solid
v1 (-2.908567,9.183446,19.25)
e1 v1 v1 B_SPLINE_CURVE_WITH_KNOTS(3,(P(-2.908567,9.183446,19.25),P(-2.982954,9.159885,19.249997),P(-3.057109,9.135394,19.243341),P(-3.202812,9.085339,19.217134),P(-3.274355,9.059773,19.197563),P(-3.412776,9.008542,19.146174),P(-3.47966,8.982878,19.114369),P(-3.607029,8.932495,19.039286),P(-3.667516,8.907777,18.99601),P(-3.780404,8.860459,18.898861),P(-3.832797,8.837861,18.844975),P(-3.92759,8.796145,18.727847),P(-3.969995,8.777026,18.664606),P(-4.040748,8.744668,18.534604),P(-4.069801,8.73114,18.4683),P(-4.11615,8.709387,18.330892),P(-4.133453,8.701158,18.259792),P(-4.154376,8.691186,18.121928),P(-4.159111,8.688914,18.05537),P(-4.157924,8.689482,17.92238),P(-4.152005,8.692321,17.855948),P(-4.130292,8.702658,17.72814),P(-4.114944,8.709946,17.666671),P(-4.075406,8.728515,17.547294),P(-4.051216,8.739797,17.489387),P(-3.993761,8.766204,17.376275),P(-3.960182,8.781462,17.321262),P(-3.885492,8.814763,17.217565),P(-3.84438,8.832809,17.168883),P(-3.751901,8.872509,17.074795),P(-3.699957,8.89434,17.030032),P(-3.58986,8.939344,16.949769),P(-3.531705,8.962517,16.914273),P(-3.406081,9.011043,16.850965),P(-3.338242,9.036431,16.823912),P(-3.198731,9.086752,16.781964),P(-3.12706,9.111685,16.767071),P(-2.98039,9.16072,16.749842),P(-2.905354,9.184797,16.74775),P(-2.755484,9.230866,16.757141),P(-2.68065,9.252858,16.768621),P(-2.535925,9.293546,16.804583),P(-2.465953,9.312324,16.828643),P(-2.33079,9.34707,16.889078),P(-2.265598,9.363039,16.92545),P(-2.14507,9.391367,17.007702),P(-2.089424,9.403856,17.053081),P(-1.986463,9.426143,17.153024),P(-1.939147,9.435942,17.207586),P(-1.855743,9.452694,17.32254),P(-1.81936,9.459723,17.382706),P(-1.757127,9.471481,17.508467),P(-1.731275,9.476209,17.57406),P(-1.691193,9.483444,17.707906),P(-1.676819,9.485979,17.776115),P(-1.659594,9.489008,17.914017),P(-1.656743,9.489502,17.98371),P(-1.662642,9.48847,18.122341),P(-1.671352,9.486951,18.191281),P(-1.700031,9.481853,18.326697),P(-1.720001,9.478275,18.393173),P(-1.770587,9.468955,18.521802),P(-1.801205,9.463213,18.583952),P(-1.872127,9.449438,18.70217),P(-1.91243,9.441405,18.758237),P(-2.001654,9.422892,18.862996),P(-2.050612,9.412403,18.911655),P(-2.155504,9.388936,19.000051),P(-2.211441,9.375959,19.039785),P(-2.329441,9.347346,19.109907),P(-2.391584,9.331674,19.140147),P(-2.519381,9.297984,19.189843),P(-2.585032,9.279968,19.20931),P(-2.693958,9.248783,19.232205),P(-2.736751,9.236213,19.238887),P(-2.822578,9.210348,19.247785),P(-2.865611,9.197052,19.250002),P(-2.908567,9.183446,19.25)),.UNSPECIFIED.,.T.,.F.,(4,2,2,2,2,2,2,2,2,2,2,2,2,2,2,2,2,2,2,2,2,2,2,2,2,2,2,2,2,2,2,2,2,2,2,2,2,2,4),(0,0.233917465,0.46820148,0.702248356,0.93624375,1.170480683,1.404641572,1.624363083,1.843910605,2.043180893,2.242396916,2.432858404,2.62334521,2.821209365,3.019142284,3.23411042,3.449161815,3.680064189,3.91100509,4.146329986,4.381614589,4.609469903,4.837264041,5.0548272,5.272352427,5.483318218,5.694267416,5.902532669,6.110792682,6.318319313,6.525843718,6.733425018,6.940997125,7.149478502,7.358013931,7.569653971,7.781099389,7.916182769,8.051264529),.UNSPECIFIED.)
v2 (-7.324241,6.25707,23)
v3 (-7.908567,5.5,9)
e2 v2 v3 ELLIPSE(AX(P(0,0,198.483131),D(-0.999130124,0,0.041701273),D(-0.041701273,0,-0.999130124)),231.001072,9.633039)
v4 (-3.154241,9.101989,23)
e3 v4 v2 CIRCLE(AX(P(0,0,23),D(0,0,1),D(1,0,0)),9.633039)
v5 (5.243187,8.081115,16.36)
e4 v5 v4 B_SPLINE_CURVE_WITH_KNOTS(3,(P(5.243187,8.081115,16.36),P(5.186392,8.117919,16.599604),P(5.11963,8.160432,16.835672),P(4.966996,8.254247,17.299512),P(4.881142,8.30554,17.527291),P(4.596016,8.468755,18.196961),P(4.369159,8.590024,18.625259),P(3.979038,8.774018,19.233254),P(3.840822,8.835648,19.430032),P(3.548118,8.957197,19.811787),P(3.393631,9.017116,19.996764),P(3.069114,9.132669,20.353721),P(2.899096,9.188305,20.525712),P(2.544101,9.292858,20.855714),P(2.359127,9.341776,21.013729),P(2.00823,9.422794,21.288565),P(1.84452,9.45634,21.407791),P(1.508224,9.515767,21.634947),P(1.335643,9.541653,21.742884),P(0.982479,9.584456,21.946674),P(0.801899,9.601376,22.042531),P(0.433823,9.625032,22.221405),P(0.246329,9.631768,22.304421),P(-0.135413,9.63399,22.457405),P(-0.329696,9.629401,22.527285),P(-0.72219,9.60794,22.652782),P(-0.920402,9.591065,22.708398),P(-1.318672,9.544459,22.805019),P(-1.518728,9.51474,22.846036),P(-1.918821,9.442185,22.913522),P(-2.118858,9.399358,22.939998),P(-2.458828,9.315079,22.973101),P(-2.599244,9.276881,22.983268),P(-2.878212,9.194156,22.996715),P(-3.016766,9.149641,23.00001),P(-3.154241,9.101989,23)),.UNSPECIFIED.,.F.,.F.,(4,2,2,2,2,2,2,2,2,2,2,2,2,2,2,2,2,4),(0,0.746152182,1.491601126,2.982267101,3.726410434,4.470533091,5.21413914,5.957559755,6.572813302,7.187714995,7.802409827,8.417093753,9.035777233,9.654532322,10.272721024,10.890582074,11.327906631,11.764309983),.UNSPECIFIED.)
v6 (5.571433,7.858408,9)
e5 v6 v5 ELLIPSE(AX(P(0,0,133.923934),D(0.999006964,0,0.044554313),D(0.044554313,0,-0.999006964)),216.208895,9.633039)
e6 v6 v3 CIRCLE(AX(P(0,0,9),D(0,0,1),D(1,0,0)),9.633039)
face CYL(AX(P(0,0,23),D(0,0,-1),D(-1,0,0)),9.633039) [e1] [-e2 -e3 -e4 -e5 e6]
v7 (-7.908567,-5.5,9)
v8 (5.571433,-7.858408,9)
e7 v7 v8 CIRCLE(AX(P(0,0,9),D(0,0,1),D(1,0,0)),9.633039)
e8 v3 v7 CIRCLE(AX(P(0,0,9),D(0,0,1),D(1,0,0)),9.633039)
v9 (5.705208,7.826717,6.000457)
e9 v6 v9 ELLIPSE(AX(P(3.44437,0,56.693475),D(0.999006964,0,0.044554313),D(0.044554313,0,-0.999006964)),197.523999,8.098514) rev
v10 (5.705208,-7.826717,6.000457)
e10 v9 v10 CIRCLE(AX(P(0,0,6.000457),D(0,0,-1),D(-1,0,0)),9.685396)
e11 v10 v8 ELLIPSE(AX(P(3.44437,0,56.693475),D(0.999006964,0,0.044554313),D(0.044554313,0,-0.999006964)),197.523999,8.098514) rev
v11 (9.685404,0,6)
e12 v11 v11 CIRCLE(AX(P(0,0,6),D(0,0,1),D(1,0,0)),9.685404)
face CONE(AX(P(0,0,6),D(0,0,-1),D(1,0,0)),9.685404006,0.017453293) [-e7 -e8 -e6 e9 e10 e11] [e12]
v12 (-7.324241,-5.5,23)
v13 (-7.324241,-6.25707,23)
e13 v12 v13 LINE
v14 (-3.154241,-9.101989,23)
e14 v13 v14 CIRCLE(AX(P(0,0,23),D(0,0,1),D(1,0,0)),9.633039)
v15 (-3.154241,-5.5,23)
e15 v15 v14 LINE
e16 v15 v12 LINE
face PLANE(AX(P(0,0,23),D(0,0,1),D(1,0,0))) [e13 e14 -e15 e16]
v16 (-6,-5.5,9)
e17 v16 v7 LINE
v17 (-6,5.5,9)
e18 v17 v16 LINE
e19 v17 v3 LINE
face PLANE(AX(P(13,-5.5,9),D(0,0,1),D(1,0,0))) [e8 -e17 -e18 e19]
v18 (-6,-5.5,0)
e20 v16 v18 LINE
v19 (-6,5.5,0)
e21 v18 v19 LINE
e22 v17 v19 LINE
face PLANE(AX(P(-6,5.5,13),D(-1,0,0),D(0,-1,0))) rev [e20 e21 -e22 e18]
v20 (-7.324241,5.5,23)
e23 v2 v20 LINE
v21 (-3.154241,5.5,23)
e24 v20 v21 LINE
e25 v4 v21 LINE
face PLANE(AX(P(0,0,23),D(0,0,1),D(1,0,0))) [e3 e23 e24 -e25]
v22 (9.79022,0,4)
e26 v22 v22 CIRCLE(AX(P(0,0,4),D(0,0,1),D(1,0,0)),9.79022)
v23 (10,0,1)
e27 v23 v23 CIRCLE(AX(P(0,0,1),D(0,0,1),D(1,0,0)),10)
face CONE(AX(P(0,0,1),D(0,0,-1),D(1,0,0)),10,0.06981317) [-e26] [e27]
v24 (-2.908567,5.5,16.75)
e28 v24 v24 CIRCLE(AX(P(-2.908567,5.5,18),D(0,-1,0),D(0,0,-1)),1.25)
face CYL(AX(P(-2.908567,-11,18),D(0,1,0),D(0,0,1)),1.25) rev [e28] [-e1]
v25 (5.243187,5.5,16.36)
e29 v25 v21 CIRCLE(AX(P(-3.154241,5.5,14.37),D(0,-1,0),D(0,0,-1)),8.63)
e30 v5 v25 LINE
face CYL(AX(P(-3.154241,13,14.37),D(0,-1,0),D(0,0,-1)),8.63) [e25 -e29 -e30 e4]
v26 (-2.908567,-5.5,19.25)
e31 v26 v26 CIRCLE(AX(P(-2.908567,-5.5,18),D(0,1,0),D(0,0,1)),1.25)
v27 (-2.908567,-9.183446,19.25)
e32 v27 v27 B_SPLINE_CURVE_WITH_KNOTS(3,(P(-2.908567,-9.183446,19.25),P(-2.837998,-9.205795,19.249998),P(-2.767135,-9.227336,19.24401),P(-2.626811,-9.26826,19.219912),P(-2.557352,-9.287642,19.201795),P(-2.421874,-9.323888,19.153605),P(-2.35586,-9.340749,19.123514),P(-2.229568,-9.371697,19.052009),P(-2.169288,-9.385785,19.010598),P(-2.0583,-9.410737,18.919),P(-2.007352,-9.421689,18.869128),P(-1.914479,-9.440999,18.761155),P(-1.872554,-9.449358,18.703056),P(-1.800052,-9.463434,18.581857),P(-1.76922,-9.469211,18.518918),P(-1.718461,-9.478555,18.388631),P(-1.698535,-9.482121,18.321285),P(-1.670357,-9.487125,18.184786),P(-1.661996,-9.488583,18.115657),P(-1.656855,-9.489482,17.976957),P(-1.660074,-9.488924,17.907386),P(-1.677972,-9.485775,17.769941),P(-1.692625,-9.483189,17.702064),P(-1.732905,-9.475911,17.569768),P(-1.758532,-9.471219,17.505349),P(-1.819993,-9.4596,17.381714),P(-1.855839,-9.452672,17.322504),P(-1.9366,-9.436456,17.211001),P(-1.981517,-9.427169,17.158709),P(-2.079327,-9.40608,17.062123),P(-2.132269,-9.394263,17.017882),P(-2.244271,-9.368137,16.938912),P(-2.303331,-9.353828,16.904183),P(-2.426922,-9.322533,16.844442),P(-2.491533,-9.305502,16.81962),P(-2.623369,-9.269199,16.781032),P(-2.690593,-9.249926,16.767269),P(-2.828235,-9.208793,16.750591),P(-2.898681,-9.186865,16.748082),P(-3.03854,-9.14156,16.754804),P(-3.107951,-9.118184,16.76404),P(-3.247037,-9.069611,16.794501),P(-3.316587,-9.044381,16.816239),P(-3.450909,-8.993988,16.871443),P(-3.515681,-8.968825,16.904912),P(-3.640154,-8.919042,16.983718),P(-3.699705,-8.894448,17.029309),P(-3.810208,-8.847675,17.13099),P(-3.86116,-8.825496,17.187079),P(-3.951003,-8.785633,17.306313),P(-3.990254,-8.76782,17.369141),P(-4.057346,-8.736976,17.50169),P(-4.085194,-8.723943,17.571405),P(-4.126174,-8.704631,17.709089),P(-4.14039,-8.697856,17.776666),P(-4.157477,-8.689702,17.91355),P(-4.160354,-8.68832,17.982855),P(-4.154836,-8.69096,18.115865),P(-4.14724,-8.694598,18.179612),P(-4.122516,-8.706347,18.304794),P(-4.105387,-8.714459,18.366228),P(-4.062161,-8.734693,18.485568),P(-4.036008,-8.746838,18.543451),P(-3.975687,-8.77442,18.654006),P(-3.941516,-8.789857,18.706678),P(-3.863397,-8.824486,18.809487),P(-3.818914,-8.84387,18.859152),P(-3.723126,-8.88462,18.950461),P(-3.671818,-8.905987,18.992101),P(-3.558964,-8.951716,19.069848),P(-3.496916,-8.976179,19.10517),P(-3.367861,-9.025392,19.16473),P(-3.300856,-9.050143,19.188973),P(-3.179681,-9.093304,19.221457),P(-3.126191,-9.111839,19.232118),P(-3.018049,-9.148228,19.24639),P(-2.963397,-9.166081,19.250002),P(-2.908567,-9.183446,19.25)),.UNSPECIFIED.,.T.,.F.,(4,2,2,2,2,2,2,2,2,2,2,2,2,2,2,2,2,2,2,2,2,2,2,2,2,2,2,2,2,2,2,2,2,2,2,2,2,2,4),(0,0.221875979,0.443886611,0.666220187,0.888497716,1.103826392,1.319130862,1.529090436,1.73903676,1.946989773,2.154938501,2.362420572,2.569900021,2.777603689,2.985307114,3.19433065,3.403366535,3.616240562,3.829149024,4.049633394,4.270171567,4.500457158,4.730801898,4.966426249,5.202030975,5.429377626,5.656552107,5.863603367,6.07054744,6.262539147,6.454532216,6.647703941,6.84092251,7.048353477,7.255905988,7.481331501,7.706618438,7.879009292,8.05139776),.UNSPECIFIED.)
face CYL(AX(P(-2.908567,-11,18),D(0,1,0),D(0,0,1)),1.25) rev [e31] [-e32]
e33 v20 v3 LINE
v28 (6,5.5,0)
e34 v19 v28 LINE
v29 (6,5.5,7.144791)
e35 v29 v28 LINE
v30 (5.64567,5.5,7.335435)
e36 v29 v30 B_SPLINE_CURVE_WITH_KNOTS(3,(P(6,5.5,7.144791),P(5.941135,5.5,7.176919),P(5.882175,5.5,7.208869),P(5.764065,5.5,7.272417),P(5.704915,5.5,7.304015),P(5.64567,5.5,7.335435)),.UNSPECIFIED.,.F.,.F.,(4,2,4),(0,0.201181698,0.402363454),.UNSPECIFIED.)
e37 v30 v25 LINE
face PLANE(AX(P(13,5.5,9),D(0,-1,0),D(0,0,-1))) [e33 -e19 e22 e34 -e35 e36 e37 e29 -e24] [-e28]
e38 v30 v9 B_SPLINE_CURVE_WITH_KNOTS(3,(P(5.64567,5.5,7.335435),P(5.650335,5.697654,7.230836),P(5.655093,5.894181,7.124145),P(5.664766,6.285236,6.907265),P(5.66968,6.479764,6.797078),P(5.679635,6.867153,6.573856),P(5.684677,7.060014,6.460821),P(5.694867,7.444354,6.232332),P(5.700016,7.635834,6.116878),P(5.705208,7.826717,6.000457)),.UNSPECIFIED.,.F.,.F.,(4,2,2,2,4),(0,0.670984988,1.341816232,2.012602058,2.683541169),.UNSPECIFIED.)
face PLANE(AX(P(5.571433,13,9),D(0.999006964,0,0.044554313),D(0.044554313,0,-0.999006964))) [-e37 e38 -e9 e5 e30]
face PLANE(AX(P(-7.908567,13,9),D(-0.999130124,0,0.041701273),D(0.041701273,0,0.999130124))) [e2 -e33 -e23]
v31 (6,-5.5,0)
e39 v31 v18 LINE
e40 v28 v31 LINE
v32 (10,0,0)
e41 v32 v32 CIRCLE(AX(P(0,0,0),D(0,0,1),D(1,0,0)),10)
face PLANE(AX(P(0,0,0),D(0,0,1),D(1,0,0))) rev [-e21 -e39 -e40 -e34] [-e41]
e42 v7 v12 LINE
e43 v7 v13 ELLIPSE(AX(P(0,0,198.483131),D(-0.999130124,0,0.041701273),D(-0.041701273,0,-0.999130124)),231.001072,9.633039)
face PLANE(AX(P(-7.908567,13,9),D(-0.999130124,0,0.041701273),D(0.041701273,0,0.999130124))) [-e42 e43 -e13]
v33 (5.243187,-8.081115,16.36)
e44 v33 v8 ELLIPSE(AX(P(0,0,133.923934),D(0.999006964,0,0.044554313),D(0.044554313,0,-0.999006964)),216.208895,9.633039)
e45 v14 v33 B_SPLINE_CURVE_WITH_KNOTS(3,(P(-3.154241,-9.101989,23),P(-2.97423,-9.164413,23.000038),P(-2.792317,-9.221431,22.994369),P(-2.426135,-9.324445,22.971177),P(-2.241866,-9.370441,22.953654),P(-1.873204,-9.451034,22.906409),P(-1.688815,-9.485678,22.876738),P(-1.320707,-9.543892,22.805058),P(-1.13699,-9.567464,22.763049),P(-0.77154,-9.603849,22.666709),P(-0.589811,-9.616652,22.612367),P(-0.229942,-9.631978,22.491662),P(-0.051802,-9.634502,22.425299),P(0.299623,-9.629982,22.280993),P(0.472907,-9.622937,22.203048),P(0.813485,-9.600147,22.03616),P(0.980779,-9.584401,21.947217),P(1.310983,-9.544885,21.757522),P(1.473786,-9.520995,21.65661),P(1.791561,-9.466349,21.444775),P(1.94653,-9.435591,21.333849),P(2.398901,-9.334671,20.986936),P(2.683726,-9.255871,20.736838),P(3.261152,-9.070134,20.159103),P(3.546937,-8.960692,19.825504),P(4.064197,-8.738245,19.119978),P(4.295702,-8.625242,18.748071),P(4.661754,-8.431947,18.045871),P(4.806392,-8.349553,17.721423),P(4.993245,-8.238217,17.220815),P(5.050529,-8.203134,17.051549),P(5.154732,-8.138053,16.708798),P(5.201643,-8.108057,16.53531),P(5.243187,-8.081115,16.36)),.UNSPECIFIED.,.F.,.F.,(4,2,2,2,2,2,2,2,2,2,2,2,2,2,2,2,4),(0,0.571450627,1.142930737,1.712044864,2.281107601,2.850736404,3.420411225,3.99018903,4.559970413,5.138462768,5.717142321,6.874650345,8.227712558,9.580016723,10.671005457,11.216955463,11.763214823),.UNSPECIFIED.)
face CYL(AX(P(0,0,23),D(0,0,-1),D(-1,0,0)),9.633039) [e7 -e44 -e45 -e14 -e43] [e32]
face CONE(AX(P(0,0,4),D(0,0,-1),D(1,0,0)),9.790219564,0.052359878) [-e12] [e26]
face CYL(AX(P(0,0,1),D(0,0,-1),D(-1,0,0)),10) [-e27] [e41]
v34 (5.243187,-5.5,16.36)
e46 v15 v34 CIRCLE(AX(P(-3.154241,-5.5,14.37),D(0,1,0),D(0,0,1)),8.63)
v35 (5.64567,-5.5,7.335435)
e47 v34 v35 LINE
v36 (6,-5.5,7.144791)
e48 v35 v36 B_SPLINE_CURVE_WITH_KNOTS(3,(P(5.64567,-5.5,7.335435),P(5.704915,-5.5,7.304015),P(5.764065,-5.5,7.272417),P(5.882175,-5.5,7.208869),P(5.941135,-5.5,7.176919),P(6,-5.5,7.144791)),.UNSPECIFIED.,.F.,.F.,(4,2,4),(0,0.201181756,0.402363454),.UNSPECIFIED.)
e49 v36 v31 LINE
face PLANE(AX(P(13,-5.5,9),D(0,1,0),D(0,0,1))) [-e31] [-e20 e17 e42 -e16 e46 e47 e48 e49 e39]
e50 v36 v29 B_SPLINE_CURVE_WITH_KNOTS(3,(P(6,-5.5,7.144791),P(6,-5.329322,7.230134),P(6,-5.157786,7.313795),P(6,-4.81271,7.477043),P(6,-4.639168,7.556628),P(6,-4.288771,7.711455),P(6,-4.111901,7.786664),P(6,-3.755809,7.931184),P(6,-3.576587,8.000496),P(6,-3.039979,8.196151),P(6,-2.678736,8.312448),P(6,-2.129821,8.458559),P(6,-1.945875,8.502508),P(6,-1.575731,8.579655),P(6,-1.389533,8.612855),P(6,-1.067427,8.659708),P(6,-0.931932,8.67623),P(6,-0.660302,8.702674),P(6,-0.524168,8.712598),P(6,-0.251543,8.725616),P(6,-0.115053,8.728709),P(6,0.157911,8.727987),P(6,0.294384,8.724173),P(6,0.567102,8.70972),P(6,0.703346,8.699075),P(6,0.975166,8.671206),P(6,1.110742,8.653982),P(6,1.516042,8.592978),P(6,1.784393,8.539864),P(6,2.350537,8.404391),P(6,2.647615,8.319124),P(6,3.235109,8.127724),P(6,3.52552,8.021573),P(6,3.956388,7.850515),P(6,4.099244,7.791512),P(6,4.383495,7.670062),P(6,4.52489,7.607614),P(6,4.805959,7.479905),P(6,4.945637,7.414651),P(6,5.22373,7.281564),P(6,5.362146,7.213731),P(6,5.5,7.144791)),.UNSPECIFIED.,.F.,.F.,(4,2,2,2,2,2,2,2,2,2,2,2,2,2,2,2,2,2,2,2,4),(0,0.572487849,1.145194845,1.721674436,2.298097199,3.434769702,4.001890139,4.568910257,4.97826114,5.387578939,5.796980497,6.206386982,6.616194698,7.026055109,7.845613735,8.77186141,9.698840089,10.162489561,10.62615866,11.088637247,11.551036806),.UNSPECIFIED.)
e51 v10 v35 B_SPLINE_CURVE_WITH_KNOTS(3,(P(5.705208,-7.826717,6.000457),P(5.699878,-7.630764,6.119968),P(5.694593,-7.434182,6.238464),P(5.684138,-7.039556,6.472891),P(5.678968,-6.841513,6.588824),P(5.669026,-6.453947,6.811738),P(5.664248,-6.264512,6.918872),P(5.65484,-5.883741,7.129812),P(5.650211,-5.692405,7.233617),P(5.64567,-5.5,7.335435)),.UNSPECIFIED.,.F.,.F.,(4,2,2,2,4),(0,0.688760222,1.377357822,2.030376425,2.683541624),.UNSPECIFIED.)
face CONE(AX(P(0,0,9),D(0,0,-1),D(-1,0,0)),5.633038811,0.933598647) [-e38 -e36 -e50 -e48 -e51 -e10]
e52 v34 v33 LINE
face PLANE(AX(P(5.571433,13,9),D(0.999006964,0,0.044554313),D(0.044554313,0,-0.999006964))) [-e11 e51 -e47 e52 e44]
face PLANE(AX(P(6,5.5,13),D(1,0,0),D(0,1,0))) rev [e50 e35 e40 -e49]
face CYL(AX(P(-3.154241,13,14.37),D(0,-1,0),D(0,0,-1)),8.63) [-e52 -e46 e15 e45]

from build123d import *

# Parameters (mm, degrees)
SKETCH1_R               = 10
BOSS_EXTRUDE1_DEPTH     = 1
SKETCH2_R               = 10
BOSS_EXTRUDE2_DEPTH     = 3
BOSS_EXTRUDE2_TAPER     = 4
SKETCH3_R               = 9.790219564
BOSS_EXTRUDE3_DEPTH     = 2
BOSS_EXTRUDE3_TAPER     = 3
SKETCH4_R               = 9.685404006
BOSS_EXTRUDE4_DEPTH     = 3
BOSS_EXTRUDE4_TAPER     = 1
SKETCH5_R               = 9.633038811
BOSS_EXTRUDE5_DEPTH     = 14
CUT_EXTRUDE1_DEPTH      = 13
CUT_EXTRUDE1_DEPTH_BACK = 13
SKETCH6_W               = 17.15
SKETCH6_H               = 11
CUT_EXTRUDE2_DEPTH      = 13
CUT_EXTRUDE2_DEPTH_BACK = 13
SKETCH8_W               = 12
SKETCH8_H               = 11
CUT_EXTRUDE3_DEPTH      = 13
SKETCH9_R               = 1.25
CUT_EXTRUDE4_DEPTH      = 11
CHAMFER1_SIZE           = 4
CHAMFER1_SIZE_2         = 3


with BuildPart() as part:
    # Sketch1 → Boss-Extrude1 (new body)
    with BuildSketch(Plane.XY):
        Circle(SKETCH1_R)
    extrude(amount=BOSS_EXTRUDE1_DEPTH)

    # Sketch2 → Boss-Extrude2 (add)
    with BuildSketch(Plane.XY.offset(1)):
        Circle(SKETCH2_R)
    extrude(amount=BOSS_EXTRUDE2_DEPTH, taper=BOSS_EXTRUDE2_TAPER)

    # Sketch3 → Boss-Extrude3 (add)
    with BuildSketch(Plane.XY.offset(4)):
        Circle(SKETCH3_R)
    extrude(amount=BOSS_EXTRUDE3_DEPTH, taper=BOSS_EXTRUDE3_TAPER)

    # Sketch4 → Boss-Extrude4 (add)
    with BuildSketch(Plane.XY.offset(6)):
        Circle(SKETCH4_R)
    extrude(amount=BOSS_EXTRUDE4_DEPTH, taper=BOSS_EXTRUDE4_TAPER)

    # Sketch5 → Boss-Extrude5 (add)
    with BuildSketch(Plane.XY.offset(9)):
        Circle(SKETCH5_R)
    extrude(amount=BOSS_EXTRUDE5_DEPTH)

    # Sketch6 → Cut-Extrude1 (cut, two sides: drawn at the far end of the back side and taken through both)
    with BuildSketch(Plane(origin=(0, 0, 0), x_dir=(0, 0, -1), z_dir=(1, 0, 0)).offset(-CUT_EXTRUDE1_DEPTH_BACK)):
        with Locations((-17.575, 0)):
            Rectangle(SKETCH6_W, SKETCH6_H)
    extrude(amount=CUT_EXTRUDE1_DEPTH + CUT_EXTRUDE1_DEPTH_BACK, mode=Mode.SUBTRACT)

    # Sketch7 → Cut-Extrude2 (cut, two sides: drawn at the far end of the back side and taken through both)
    with BuildSketch(Plane(origin=(0, 0, 0), x_dir=(1, 0, 0), z_dir=(0, 1, 0)).offset(-CUT_EXTRUDE2_DEPTH_BACK)):
        with BuildLine():
            Line((-7.9085673, -9), (-9.6485673, -9))
            Line((-9.6485673, -9), (-9.6485673, -28.451581468))
            Line((-9.6485673, -28.451581468), (9.633038811, -28.451581468))
            Line((9.633038811, -28.451581468), (9.633038811, -9))
            Line((9.633038811, -9), (5.5714327, -9))
            Line((5.5714327, -9), (5.243186995, -16.36))
            ThreePointArc((5.243186995, -16.36), (2.198477753, -21.139438677), (-3.154241182, -23))
            Line((-3.154241182, -23), (-7.324241182, -23))
            Line((-7.324241182, -23), (-7.9085673, -9))
        make_face()
    extrude(amount=CUT_EXTRUDE2_DEPTH + CUT_EXTRUDE2_DEPTH_BACK, mode=Mode.SUBTRACT)

    # Sketch8 → Cut-Extrude3 (cut)
    with BuildSketch(Plane(origin=(0, 0, 0), x_dir=(-1, 0, 0), z_dir=(0, 0, -1))):
        Rectangle(SKETCH8_W, SKETCH8_H)
    extrude(amount=-CUT_EXTRUDE3_DEPTH, mode=Mode.SUBTRACT)

    # Sketch9 → Cut-Extrude4 (cut, symmetric)
    with BuildSketch(Plane(origin=(0, 0, 0), x_dir=(1, 0, 0), z_dir=(0, 1, 0))):
        with Locations(Location((-2.9085673, -18, 0), (0, 0, 270))):
            Circle(SKETCH9_R)
    extrude(amount=CUT_EXTRUDE4_DEPTH, both=True, mode=Mode.SUBTRACT)

    # Chamfer1
    # the kernel refuses this chamfer: 4, 3 mm, written as the material it takes off along each edge
    with BuildSketch(Plane(origin=(0, 0, 9), x_dir=(-0.4396306058143097, 0.8981786740016393, 0), z_dir=(-0.8981786740016393, -0.4396306058143097, 0))) as chamfer1_piece_1_section:
        Polygon((9.633038811 - CHAMFER1_SIZE, 0), (9.633038811 + CHAMFER1_SIZE_2 * 0.0174524064373, CHAMFER1_SIZE_2 * 0.999847695156), (9.633038811, 0), align=None)
    chamfer1_piece_1 = revolve(axis=Axis((0, 0, 9), (0, 0, -1)), revolution_arc=116.080314714, mode=Mode.PRIVATE)
    chamfer1_piece_1 = split(chamfer1_piece_1, bisect_by=Plane(origin=(5.560372923, 0, 9.247984855), z_dir=(0.9990069635270564, 0, 0.04455431319693658)), keep=Keep.TOP, mode=Mode.PRIVATE)
    add(chamfer1_piece_1, mode=Mode.SUBTRACT)
    with BuildSketch(Plane(origin=(0, 0, 9), x_dir=(1, 0, 0), z_dir=(0, 1, 0))) as chamfer1_piece_2_section:
        Polygon((9.633038811 - CHAMFER1_SIZE, 0), (9.633038811 + CHAMFER1_SIZE_2 * 0.0174524064373, CHAMFER1_SIZE_2 * 0.999847695156), (9.633038811, 0), align=None)
    chamfer1_piece_2 = revolve(axis=Axis((0, 0, 9), (0, 0, -1)), revolution_arc=116.080314714, mode=Mode.PRIVATE)
    chamfer1_piece_2 = split(chamfer1_piece_2, bisect_by=Plane(origin=(5.560372923, 0, 9.247984855), z_dir=(0.9990069635270564, 0, 0.04455431319693658)), keep=Keep.TOP, mode=Mode.PRIVATE)
    add(chamfer1_piece_2, mode=Mode.SUBTRACT)


solid = part.part
